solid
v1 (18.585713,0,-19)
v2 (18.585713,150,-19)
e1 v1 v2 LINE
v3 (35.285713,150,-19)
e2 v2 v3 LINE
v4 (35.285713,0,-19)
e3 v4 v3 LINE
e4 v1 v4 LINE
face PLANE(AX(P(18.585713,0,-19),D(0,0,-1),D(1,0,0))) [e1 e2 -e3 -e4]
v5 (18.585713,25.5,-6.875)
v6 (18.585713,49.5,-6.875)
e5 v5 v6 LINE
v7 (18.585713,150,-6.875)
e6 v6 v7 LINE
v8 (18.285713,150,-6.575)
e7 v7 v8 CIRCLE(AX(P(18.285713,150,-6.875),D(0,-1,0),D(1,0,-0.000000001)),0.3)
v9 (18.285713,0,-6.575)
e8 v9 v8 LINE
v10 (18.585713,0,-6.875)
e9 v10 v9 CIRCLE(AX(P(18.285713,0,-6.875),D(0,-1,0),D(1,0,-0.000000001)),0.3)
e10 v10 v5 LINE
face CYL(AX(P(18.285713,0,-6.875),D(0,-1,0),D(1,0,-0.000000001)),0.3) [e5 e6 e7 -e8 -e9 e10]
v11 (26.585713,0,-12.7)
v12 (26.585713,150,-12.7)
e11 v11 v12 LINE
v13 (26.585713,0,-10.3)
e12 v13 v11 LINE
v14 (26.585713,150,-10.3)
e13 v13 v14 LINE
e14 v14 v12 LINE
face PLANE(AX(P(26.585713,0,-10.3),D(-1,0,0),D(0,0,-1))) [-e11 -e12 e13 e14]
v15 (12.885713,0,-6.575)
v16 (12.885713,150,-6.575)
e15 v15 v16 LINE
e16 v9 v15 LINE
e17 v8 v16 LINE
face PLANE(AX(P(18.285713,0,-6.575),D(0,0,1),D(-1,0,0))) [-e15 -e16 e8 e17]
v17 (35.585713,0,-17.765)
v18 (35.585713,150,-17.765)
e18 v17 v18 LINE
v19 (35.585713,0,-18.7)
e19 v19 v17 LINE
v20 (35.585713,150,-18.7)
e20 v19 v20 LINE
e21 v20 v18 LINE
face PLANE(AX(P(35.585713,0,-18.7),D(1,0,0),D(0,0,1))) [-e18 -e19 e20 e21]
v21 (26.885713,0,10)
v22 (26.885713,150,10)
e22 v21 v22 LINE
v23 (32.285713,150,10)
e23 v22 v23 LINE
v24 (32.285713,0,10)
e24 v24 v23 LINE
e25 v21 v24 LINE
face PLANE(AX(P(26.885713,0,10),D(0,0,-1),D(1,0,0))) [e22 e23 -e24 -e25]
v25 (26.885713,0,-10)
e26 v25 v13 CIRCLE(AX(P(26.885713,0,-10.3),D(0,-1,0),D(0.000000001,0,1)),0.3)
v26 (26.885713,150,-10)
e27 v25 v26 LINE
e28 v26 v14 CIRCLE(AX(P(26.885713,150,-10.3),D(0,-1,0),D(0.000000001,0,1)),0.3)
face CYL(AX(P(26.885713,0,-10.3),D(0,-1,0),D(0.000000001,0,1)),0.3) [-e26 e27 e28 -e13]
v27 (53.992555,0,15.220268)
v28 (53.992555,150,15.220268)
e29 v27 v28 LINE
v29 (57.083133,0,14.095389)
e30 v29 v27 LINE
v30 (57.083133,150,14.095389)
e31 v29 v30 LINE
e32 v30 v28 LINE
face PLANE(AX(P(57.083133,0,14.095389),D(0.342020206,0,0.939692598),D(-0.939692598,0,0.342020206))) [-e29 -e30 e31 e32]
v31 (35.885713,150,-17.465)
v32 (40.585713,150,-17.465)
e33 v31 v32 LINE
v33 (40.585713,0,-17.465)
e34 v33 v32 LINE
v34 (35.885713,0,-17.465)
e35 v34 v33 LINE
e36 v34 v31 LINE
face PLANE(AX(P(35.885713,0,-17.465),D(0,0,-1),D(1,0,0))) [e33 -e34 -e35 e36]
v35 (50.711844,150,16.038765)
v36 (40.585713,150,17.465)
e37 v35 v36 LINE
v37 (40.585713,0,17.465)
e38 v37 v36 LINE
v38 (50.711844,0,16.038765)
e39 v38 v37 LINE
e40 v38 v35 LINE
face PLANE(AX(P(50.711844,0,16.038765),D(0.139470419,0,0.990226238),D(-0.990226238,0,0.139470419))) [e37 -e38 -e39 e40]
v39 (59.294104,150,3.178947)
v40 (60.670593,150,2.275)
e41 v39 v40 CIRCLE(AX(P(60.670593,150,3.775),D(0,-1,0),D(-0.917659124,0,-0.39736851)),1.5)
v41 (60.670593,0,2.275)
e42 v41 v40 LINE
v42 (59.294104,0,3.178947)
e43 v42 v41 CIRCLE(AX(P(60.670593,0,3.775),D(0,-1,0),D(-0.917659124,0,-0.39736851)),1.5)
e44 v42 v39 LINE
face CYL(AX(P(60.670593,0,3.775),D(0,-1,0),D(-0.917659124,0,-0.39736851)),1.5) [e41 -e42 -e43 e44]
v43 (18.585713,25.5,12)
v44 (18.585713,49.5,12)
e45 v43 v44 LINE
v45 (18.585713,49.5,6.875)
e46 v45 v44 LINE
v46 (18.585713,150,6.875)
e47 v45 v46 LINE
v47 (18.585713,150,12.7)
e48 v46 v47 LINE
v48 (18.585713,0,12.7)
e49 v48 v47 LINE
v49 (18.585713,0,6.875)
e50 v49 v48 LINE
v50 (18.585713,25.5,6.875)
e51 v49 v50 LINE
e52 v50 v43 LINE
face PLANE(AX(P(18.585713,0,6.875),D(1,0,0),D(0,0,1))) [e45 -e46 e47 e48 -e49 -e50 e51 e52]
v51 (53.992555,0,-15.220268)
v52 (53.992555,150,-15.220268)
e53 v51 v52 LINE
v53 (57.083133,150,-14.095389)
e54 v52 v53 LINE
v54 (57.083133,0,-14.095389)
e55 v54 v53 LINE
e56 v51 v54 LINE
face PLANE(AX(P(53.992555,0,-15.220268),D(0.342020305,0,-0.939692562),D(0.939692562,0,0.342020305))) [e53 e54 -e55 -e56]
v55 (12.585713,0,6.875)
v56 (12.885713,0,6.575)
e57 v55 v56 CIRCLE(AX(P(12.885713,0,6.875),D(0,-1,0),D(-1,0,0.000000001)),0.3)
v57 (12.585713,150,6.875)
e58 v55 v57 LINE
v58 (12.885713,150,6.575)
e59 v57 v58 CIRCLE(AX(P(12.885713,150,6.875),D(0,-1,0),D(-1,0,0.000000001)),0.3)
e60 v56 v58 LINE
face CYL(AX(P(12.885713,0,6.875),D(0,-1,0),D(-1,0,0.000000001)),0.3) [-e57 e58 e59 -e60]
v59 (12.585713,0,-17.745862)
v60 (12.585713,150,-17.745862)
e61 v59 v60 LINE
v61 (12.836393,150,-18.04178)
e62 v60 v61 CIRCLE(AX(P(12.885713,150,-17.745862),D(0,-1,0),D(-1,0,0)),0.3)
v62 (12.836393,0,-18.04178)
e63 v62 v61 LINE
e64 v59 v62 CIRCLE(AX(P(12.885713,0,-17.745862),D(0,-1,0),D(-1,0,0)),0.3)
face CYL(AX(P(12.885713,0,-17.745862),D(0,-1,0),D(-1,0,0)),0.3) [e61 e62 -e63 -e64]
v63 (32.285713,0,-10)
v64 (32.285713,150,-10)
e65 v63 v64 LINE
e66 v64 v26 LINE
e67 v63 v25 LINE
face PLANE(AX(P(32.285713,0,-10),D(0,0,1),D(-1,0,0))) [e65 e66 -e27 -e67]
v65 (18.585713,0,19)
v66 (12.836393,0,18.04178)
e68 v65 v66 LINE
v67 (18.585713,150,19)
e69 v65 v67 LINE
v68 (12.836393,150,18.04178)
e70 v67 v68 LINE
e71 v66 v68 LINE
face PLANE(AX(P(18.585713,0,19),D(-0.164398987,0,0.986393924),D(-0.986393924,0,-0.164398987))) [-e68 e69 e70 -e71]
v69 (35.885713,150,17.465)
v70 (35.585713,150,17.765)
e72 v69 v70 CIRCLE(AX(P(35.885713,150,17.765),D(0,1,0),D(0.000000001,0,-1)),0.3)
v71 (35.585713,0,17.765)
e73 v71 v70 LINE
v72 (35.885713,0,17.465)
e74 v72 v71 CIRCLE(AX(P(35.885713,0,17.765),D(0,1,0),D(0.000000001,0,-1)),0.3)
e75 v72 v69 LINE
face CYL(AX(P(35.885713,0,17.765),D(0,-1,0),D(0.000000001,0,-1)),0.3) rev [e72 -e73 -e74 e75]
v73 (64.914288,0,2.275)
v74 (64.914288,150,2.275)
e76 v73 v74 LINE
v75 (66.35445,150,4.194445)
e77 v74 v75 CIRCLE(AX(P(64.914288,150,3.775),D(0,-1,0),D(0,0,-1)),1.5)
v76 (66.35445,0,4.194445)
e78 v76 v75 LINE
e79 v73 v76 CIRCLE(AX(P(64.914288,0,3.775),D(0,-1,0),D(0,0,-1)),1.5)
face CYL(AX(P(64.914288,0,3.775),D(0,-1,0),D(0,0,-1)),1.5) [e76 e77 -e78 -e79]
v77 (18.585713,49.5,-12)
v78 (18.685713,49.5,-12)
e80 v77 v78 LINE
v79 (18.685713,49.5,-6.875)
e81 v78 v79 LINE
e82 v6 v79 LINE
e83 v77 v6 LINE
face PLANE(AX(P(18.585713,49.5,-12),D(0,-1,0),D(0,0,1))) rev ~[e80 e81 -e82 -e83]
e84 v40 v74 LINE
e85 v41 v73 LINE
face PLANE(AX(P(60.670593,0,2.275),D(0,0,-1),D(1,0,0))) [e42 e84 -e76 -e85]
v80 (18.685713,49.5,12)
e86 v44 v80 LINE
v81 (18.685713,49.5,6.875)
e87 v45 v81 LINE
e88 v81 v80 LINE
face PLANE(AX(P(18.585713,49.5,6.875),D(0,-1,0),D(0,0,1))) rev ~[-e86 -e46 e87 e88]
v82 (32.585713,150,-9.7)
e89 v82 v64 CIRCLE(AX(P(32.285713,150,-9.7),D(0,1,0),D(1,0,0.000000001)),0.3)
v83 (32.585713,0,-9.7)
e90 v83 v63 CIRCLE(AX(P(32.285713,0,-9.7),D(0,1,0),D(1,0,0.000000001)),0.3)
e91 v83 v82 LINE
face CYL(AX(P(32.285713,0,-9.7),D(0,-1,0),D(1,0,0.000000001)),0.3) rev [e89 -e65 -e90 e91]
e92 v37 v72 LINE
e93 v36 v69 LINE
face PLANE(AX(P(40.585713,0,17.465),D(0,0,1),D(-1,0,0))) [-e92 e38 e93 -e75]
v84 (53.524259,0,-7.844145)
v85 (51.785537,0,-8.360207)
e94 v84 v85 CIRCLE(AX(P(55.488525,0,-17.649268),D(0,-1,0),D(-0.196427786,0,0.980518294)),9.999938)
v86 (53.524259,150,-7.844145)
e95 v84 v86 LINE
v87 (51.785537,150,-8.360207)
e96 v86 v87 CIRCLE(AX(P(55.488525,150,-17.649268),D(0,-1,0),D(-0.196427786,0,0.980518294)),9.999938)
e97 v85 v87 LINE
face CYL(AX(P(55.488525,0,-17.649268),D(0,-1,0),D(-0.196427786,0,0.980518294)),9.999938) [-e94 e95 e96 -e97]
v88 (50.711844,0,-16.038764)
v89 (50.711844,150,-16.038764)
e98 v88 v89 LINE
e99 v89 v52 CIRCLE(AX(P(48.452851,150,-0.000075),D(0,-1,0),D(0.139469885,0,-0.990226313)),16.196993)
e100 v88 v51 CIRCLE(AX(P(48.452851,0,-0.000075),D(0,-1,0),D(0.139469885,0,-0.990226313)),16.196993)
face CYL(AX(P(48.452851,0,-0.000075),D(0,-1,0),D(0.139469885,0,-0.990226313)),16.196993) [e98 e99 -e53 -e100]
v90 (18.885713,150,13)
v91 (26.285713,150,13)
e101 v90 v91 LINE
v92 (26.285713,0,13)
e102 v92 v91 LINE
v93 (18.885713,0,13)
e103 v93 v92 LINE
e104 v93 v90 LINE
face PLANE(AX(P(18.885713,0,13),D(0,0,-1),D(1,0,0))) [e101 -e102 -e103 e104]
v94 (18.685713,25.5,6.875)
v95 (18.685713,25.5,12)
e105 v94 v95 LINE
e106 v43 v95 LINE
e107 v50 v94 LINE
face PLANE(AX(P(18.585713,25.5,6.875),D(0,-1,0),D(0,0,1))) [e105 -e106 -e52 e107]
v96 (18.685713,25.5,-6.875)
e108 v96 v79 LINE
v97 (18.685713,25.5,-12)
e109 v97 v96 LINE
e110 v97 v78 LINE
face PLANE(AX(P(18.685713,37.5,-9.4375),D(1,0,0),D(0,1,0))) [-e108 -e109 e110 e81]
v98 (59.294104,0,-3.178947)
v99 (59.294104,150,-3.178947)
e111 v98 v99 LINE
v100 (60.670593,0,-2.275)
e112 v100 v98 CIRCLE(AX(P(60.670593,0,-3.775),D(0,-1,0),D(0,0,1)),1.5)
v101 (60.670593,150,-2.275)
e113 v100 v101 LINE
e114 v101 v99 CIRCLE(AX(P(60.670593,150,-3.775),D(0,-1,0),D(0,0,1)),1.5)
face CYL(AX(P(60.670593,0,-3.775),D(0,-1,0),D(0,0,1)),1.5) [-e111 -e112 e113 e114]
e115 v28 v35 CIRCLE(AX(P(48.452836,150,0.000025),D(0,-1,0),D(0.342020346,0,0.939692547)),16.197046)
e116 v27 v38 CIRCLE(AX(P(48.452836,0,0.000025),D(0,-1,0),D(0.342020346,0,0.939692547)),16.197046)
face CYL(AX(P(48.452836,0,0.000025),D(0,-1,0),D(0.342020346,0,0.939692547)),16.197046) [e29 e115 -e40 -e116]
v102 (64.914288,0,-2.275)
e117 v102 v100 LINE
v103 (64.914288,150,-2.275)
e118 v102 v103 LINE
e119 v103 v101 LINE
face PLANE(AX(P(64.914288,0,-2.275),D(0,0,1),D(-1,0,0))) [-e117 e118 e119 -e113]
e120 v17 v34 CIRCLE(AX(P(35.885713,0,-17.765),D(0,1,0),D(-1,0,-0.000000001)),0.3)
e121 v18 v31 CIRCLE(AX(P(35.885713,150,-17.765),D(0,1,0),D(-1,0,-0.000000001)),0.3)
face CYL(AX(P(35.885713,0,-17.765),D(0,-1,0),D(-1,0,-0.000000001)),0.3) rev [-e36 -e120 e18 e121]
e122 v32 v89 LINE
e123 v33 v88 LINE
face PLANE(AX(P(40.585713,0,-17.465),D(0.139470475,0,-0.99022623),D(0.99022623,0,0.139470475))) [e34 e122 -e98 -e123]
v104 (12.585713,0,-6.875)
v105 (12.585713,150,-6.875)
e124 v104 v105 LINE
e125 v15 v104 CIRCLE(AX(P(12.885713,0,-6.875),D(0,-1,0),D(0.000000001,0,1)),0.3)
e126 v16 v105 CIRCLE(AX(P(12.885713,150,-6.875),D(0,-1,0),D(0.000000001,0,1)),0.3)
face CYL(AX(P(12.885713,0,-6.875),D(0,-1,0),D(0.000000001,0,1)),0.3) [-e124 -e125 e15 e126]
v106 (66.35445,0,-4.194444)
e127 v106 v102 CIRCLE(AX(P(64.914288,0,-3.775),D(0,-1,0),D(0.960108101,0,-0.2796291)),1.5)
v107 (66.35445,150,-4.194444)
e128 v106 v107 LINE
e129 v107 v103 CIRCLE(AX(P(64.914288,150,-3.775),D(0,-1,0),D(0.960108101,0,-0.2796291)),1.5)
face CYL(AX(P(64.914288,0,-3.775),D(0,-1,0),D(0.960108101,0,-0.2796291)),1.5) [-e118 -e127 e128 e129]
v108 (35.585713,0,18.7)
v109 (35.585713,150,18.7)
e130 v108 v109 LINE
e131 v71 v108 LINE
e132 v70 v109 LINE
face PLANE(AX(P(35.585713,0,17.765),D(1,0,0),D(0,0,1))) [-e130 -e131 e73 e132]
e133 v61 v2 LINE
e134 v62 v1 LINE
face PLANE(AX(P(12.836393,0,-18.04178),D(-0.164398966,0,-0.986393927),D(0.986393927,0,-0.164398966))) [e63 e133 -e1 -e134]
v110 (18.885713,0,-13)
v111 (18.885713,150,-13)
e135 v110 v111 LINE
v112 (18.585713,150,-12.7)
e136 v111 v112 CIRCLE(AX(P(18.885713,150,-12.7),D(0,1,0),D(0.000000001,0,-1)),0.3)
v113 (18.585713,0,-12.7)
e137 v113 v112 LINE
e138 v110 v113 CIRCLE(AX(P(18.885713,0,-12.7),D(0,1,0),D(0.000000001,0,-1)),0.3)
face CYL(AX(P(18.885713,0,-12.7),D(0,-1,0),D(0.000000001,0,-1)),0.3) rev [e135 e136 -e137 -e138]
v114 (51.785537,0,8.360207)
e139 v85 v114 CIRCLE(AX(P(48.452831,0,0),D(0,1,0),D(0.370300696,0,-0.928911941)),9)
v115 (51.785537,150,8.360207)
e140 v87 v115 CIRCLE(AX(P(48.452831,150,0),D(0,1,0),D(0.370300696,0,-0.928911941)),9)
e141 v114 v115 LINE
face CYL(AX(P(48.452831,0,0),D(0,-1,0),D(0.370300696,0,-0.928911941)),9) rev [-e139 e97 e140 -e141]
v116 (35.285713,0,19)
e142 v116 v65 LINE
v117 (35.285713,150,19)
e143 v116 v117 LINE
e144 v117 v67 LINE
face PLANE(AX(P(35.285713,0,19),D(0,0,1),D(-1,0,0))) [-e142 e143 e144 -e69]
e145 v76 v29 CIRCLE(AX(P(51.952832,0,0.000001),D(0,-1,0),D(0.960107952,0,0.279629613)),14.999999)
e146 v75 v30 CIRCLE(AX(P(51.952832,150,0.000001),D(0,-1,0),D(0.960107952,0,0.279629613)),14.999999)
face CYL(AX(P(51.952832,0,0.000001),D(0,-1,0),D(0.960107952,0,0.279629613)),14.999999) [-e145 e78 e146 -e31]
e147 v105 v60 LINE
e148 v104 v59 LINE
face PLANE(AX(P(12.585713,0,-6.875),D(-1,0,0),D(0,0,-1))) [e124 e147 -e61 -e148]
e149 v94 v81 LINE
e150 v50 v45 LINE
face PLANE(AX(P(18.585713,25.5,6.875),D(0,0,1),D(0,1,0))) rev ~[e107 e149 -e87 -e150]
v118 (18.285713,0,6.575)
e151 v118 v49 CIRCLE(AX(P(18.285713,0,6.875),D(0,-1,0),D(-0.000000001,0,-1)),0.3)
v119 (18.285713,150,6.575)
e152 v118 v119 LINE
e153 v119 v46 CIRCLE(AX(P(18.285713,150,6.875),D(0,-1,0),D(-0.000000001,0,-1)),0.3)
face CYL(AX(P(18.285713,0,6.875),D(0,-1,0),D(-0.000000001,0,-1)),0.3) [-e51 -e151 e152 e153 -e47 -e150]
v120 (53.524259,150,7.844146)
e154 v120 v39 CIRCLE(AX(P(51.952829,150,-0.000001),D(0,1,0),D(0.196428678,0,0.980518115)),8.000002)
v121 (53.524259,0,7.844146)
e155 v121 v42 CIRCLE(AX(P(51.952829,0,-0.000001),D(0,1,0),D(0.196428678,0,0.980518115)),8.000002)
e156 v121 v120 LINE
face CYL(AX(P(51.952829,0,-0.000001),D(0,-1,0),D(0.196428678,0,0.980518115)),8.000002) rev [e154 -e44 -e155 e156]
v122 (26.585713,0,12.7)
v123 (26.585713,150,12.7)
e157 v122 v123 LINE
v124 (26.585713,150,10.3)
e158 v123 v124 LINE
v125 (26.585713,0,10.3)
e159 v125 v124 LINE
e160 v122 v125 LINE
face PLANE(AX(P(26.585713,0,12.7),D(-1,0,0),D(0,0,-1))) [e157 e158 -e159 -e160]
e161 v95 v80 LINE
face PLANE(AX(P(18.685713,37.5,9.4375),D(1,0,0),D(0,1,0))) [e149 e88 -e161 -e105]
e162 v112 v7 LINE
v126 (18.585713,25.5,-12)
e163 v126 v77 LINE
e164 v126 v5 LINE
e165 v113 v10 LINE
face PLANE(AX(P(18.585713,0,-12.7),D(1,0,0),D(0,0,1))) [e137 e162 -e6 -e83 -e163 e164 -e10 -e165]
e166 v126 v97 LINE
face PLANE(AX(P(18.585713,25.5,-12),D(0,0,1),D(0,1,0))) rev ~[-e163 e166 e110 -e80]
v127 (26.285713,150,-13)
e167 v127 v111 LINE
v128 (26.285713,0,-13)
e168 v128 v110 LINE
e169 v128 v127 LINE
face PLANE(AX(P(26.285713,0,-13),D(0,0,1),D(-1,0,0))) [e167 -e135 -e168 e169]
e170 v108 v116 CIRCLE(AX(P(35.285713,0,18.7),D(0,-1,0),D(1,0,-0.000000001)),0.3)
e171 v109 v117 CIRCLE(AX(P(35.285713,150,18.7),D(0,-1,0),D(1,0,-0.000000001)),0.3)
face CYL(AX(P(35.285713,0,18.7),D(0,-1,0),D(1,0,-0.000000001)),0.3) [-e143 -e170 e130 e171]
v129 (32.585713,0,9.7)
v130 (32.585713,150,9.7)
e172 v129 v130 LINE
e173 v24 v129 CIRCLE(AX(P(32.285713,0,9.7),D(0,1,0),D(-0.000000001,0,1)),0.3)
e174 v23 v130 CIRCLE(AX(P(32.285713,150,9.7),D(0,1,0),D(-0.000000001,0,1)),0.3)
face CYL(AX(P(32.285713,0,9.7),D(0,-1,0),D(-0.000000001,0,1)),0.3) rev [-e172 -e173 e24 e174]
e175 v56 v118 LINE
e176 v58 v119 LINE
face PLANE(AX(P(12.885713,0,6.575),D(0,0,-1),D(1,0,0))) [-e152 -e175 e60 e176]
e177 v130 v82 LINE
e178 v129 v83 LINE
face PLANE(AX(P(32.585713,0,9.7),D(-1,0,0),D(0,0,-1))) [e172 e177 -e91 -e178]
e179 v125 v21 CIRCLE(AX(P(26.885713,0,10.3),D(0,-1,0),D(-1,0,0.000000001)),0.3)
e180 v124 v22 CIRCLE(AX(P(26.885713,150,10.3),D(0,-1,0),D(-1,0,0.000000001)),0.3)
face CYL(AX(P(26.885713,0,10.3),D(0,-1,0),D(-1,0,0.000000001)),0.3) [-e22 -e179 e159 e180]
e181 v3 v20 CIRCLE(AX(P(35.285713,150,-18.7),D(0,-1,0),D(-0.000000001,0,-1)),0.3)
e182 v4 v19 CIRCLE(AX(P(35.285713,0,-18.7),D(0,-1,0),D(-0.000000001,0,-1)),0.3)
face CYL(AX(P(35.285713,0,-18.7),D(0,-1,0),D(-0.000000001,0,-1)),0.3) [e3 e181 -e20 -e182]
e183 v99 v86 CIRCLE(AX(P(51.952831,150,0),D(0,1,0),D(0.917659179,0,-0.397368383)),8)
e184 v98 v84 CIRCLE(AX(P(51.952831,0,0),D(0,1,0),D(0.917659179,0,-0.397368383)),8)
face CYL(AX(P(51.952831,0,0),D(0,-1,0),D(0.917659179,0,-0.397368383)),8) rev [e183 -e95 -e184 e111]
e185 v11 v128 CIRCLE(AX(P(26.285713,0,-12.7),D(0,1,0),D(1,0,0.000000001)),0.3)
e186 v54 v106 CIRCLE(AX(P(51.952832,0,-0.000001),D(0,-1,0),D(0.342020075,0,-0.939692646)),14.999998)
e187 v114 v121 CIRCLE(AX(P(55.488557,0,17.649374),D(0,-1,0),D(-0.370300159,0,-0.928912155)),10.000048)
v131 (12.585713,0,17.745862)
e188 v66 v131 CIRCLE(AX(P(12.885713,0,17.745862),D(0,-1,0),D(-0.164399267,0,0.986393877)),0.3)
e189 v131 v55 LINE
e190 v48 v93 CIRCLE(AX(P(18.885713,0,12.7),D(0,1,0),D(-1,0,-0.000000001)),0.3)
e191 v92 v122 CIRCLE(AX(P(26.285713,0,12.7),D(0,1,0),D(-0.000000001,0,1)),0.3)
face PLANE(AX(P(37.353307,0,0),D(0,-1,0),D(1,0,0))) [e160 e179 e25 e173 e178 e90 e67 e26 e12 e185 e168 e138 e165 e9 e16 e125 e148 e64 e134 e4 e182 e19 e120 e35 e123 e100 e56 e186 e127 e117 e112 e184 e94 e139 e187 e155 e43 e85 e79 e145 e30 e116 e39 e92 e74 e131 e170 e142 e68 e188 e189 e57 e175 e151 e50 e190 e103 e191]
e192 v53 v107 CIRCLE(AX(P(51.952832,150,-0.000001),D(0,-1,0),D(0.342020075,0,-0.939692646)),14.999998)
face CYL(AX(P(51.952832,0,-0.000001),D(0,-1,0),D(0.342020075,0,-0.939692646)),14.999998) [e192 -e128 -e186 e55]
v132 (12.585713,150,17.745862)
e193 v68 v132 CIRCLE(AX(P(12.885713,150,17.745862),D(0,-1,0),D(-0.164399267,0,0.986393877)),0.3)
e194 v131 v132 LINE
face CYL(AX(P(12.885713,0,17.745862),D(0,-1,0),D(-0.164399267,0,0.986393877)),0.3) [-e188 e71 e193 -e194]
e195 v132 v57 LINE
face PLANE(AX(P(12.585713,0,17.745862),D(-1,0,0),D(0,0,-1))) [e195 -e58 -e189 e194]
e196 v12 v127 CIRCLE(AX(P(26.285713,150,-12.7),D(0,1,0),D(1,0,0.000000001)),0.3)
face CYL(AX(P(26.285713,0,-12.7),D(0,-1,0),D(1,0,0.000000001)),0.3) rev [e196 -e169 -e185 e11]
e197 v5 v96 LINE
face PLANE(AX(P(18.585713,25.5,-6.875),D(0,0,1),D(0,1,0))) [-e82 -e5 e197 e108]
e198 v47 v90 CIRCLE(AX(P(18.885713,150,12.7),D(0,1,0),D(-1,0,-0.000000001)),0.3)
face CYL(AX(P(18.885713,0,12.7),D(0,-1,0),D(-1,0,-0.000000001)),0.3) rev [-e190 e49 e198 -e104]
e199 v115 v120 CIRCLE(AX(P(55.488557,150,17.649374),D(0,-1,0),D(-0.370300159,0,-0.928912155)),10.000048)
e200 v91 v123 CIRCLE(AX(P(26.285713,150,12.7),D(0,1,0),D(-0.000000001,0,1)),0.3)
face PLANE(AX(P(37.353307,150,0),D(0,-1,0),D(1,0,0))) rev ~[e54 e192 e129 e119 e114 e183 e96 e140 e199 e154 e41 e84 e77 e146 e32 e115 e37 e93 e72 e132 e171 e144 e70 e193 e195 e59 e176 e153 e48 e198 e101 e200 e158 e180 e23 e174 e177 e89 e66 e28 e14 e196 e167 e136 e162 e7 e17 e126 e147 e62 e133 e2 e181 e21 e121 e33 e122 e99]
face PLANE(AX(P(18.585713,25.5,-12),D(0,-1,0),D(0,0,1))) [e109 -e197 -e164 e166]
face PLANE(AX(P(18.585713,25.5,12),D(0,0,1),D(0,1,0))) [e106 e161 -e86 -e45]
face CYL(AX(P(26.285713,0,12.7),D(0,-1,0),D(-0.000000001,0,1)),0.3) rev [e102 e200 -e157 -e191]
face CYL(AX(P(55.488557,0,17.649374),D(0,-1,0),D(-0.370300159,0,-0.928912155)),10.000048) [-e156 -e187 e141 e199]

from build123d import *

# Parameters (mm, degrees)
F1_DEPTH = 150
F2_W     = 24
F2_H     = 5.125
F3_DEPTH = 0.1
F4_DEPTH = 0.1


# Not quite as in the source:
# - ends of sketch curves that miss each other by under 0.0002 mm in the source are joined


with BuildPart() as f1:
    # F0 (on Front) → F1 (new body)
    with BuildSketch(Plane.XZ):
        with BuildLine():
            Line((53.992555, -15.220268), (57.083133, -14.095389))
            ThreePointArc((57.083133, -14.095389), (62.9018568836, -10.252747544), (66.3544503107, -4.1944440905))
            ThreePointArc((66.3544503107, -4.1944440905), (66.1141142416, -2.8747683688), (64.914288, -2.275))
            Line((64.914288, -2.275), (60.670593, -2.275))
            ThreePointArc((60.670593, -2.275), (59.8472095147, -2.5211899521), (59.2941043505, -3.1789471518))
            ThreePointArc((59.2941043505, -3.1789471518), (56.9827494729, -6.2209259886), (53.52425904, -7.8441451998))
            ThreePointArc((53.52425904, -7.8441451998), (52.6431740995, -8.0626756758), (51.7855370008, -8.3602070021))
            ThreePointArc((51.7855370008, -8.3602070021), (39.452831, 0), (51.7855371982, 8.3602074972))
            ThreePointArc((51.7855371982, 8.3602074972), (52.6431743712, 8.0626765952), (53.524259133, 7.844145664))
            ThreePointArc((53.524259133, 7.844145664), (56.9827494729, 6.2209259886), (59.2941043849, 3.1789471667))
            ThreePointArc((59.2941043849, 3.1789471667), (59.8472095147, 2.5211899521), (60.670593, 2.275))
            Line((60.670593, 2.275), (64.914288, 2.275))
            ThreePointArc((64.914288, 2.275), (66.1141145297, 2.8747687527), (66.3544497778, 4.1944449353))
            ThreePointArc((66.3544497778, 4.1944449353), (62.9018565554, 10.2527478944), (57.0831331177, 14.0953893235))
            Line((57.0831331177, 14.0953893235), (53.992555, 15.220268))
            ThreePointArc((53.992555, 15.220268), (52.3736165632, 15.715360306), (50.7118440801, 16.0387645685))
            Line((50.7118440801, 16.0387645685), (40.585713, 17.465))
            Line((40.585713, 17.465), (35.885713, 17.465))
            ThreePointArc((35.885713, 17.465), (35.6735809656, 17.5528679656), (35.585713, 17.765))
            Line((35.585713, 17.765), (35.585713, 18.7))
            ThreePointArc((35.585713, 18.7), (35.4978450344, 18.9121320344), (35.285713, 19))
            Line((35.285713, 19), (18.585713, 19))
            Line((18.585713, 19), (12.836393, 18.04178))
            ThreePointArc((12.836393, 18.04178), (12.656806899, 17.9397743434), (12.585713, 17.745862))
            Line((12.585713, 17.745862), (12.585713, 6.875))
            ThreePointArc((12.585713, 6.875), (12.6735809656, 6.6628679656), (12.885713, 6.575))
            Line((12.885713, 6.575), (18.285713, 6.575))
            ThreePointArc((18.285713, 6.575), (18.4978450344, 6.6628679656), (18.585713, 6.875))
            Line((18.585713, 6.875), (18.585713, 12.7))
            ThreePointArc((18.585713, 12.7), (18.6735809656, 12.9121320344), (18.885713, 13))
            Line((18.885713, 13), (26.285713, 13))
            ThreePointArc((26.285713, 13), (26.4978450344, 12.9121320344), (26.585713, 12.7))
            Line((26.585713, 12.7), (26.585713, 10.3))
            ThreePointArc((26.585713, 10.3), (26.6735809656, 10.0878679656), (26.885713, 10))
            Line((26.885713, 10), (32.285713, 10))
            ThreePointArc((32.285713, 10), (32.4978450344, 9.9121320344), (32.585713, 9.7))
            Line((32.585713, 9.7), (32.585713, -9.7))
            ThreePointArc((32.585713, -9.7), (32.4978450344, -9.9121320344), (32.285713, -10))
            Line((32.285713, -10), (26.885713, -10))
            ThreePointArc((26.885713, -10), (26.6735809656, -10.0878679656), (26.585713, -10.3))
            Line((26.585713, -10.3), (26.585713, -12.7))
            ThreePointArc((26.585713, -12.7), (26.4978450344, -12.9121320344), (26.285713, -13))
            Line((26.285713, -13), (18.885713, -13))
            ThreePointArc((18.885713, -13), (18.6735809656, -12.9121320344), (18.585713, -12.7))
            Line((18.585713, -12.7), (18.585713, -6.875))
            ThreePointArc((18.585713, -6.875), (18.4978450344, -6.6628679656), (18.285713, -6.575))
            Line((18.285713, -6.575), (12.885713, -6.575))
            ThreePointArc((12.885713, -6.575), (12.6735809656, -6.6628679656), (12.585713, -6.875))
            Line((12.585713, -6.875), (12.585713, -17.745862))
            ThreePointArc((12.585713, -17.745862), (12.656806899, -17.9397743434), (12.8363929795, -18.0417801231))
            Line((12.8363929795, -18.0417801231), (18.585713, -19))
            Line((18.585713, -19), (35.285713, -19))
            ThreePointArc((35.285713, -19), (35.4978450344, -18.9121320344), (35.585713, -18.7))
            Line((35.585713, -18.7), (35.585713, -17.765))
            ThreePointArc((35.585713, -17.765), (35.6735809656, -17.5528679656), (35.885713, -17.465))
            Line((35.885713, -17.465), (40.585713, -17.465))
            Line((40.585713, -17.465), (50.711844, -16.038764))
            ThreePointArc((50.711844, -16.038764), (52.3736165632, -15.715360306), (53.992555, -15.220268))
        make_face()
    extrude(amount=-F1_DEPTH)

    # F2 (on face) → F3 (join)
    with BuildSketch(Plane.YZ.offset(18.585713)):
        with Locations((37.5, 9.4375)):
            Rectangle(F2_W, F2_H)
    extrude(amount=F3_DEPTH)

    # F2 (on face) → F4 (join)
    with BuildSketch(Plane.YZ.offset(18.585713)):
        with Locations((37.5, -9.4375)):
            Rectangle(F2_W, F2_H)
    extrude(amount=F4_DEPTH)


solid = f1.part
